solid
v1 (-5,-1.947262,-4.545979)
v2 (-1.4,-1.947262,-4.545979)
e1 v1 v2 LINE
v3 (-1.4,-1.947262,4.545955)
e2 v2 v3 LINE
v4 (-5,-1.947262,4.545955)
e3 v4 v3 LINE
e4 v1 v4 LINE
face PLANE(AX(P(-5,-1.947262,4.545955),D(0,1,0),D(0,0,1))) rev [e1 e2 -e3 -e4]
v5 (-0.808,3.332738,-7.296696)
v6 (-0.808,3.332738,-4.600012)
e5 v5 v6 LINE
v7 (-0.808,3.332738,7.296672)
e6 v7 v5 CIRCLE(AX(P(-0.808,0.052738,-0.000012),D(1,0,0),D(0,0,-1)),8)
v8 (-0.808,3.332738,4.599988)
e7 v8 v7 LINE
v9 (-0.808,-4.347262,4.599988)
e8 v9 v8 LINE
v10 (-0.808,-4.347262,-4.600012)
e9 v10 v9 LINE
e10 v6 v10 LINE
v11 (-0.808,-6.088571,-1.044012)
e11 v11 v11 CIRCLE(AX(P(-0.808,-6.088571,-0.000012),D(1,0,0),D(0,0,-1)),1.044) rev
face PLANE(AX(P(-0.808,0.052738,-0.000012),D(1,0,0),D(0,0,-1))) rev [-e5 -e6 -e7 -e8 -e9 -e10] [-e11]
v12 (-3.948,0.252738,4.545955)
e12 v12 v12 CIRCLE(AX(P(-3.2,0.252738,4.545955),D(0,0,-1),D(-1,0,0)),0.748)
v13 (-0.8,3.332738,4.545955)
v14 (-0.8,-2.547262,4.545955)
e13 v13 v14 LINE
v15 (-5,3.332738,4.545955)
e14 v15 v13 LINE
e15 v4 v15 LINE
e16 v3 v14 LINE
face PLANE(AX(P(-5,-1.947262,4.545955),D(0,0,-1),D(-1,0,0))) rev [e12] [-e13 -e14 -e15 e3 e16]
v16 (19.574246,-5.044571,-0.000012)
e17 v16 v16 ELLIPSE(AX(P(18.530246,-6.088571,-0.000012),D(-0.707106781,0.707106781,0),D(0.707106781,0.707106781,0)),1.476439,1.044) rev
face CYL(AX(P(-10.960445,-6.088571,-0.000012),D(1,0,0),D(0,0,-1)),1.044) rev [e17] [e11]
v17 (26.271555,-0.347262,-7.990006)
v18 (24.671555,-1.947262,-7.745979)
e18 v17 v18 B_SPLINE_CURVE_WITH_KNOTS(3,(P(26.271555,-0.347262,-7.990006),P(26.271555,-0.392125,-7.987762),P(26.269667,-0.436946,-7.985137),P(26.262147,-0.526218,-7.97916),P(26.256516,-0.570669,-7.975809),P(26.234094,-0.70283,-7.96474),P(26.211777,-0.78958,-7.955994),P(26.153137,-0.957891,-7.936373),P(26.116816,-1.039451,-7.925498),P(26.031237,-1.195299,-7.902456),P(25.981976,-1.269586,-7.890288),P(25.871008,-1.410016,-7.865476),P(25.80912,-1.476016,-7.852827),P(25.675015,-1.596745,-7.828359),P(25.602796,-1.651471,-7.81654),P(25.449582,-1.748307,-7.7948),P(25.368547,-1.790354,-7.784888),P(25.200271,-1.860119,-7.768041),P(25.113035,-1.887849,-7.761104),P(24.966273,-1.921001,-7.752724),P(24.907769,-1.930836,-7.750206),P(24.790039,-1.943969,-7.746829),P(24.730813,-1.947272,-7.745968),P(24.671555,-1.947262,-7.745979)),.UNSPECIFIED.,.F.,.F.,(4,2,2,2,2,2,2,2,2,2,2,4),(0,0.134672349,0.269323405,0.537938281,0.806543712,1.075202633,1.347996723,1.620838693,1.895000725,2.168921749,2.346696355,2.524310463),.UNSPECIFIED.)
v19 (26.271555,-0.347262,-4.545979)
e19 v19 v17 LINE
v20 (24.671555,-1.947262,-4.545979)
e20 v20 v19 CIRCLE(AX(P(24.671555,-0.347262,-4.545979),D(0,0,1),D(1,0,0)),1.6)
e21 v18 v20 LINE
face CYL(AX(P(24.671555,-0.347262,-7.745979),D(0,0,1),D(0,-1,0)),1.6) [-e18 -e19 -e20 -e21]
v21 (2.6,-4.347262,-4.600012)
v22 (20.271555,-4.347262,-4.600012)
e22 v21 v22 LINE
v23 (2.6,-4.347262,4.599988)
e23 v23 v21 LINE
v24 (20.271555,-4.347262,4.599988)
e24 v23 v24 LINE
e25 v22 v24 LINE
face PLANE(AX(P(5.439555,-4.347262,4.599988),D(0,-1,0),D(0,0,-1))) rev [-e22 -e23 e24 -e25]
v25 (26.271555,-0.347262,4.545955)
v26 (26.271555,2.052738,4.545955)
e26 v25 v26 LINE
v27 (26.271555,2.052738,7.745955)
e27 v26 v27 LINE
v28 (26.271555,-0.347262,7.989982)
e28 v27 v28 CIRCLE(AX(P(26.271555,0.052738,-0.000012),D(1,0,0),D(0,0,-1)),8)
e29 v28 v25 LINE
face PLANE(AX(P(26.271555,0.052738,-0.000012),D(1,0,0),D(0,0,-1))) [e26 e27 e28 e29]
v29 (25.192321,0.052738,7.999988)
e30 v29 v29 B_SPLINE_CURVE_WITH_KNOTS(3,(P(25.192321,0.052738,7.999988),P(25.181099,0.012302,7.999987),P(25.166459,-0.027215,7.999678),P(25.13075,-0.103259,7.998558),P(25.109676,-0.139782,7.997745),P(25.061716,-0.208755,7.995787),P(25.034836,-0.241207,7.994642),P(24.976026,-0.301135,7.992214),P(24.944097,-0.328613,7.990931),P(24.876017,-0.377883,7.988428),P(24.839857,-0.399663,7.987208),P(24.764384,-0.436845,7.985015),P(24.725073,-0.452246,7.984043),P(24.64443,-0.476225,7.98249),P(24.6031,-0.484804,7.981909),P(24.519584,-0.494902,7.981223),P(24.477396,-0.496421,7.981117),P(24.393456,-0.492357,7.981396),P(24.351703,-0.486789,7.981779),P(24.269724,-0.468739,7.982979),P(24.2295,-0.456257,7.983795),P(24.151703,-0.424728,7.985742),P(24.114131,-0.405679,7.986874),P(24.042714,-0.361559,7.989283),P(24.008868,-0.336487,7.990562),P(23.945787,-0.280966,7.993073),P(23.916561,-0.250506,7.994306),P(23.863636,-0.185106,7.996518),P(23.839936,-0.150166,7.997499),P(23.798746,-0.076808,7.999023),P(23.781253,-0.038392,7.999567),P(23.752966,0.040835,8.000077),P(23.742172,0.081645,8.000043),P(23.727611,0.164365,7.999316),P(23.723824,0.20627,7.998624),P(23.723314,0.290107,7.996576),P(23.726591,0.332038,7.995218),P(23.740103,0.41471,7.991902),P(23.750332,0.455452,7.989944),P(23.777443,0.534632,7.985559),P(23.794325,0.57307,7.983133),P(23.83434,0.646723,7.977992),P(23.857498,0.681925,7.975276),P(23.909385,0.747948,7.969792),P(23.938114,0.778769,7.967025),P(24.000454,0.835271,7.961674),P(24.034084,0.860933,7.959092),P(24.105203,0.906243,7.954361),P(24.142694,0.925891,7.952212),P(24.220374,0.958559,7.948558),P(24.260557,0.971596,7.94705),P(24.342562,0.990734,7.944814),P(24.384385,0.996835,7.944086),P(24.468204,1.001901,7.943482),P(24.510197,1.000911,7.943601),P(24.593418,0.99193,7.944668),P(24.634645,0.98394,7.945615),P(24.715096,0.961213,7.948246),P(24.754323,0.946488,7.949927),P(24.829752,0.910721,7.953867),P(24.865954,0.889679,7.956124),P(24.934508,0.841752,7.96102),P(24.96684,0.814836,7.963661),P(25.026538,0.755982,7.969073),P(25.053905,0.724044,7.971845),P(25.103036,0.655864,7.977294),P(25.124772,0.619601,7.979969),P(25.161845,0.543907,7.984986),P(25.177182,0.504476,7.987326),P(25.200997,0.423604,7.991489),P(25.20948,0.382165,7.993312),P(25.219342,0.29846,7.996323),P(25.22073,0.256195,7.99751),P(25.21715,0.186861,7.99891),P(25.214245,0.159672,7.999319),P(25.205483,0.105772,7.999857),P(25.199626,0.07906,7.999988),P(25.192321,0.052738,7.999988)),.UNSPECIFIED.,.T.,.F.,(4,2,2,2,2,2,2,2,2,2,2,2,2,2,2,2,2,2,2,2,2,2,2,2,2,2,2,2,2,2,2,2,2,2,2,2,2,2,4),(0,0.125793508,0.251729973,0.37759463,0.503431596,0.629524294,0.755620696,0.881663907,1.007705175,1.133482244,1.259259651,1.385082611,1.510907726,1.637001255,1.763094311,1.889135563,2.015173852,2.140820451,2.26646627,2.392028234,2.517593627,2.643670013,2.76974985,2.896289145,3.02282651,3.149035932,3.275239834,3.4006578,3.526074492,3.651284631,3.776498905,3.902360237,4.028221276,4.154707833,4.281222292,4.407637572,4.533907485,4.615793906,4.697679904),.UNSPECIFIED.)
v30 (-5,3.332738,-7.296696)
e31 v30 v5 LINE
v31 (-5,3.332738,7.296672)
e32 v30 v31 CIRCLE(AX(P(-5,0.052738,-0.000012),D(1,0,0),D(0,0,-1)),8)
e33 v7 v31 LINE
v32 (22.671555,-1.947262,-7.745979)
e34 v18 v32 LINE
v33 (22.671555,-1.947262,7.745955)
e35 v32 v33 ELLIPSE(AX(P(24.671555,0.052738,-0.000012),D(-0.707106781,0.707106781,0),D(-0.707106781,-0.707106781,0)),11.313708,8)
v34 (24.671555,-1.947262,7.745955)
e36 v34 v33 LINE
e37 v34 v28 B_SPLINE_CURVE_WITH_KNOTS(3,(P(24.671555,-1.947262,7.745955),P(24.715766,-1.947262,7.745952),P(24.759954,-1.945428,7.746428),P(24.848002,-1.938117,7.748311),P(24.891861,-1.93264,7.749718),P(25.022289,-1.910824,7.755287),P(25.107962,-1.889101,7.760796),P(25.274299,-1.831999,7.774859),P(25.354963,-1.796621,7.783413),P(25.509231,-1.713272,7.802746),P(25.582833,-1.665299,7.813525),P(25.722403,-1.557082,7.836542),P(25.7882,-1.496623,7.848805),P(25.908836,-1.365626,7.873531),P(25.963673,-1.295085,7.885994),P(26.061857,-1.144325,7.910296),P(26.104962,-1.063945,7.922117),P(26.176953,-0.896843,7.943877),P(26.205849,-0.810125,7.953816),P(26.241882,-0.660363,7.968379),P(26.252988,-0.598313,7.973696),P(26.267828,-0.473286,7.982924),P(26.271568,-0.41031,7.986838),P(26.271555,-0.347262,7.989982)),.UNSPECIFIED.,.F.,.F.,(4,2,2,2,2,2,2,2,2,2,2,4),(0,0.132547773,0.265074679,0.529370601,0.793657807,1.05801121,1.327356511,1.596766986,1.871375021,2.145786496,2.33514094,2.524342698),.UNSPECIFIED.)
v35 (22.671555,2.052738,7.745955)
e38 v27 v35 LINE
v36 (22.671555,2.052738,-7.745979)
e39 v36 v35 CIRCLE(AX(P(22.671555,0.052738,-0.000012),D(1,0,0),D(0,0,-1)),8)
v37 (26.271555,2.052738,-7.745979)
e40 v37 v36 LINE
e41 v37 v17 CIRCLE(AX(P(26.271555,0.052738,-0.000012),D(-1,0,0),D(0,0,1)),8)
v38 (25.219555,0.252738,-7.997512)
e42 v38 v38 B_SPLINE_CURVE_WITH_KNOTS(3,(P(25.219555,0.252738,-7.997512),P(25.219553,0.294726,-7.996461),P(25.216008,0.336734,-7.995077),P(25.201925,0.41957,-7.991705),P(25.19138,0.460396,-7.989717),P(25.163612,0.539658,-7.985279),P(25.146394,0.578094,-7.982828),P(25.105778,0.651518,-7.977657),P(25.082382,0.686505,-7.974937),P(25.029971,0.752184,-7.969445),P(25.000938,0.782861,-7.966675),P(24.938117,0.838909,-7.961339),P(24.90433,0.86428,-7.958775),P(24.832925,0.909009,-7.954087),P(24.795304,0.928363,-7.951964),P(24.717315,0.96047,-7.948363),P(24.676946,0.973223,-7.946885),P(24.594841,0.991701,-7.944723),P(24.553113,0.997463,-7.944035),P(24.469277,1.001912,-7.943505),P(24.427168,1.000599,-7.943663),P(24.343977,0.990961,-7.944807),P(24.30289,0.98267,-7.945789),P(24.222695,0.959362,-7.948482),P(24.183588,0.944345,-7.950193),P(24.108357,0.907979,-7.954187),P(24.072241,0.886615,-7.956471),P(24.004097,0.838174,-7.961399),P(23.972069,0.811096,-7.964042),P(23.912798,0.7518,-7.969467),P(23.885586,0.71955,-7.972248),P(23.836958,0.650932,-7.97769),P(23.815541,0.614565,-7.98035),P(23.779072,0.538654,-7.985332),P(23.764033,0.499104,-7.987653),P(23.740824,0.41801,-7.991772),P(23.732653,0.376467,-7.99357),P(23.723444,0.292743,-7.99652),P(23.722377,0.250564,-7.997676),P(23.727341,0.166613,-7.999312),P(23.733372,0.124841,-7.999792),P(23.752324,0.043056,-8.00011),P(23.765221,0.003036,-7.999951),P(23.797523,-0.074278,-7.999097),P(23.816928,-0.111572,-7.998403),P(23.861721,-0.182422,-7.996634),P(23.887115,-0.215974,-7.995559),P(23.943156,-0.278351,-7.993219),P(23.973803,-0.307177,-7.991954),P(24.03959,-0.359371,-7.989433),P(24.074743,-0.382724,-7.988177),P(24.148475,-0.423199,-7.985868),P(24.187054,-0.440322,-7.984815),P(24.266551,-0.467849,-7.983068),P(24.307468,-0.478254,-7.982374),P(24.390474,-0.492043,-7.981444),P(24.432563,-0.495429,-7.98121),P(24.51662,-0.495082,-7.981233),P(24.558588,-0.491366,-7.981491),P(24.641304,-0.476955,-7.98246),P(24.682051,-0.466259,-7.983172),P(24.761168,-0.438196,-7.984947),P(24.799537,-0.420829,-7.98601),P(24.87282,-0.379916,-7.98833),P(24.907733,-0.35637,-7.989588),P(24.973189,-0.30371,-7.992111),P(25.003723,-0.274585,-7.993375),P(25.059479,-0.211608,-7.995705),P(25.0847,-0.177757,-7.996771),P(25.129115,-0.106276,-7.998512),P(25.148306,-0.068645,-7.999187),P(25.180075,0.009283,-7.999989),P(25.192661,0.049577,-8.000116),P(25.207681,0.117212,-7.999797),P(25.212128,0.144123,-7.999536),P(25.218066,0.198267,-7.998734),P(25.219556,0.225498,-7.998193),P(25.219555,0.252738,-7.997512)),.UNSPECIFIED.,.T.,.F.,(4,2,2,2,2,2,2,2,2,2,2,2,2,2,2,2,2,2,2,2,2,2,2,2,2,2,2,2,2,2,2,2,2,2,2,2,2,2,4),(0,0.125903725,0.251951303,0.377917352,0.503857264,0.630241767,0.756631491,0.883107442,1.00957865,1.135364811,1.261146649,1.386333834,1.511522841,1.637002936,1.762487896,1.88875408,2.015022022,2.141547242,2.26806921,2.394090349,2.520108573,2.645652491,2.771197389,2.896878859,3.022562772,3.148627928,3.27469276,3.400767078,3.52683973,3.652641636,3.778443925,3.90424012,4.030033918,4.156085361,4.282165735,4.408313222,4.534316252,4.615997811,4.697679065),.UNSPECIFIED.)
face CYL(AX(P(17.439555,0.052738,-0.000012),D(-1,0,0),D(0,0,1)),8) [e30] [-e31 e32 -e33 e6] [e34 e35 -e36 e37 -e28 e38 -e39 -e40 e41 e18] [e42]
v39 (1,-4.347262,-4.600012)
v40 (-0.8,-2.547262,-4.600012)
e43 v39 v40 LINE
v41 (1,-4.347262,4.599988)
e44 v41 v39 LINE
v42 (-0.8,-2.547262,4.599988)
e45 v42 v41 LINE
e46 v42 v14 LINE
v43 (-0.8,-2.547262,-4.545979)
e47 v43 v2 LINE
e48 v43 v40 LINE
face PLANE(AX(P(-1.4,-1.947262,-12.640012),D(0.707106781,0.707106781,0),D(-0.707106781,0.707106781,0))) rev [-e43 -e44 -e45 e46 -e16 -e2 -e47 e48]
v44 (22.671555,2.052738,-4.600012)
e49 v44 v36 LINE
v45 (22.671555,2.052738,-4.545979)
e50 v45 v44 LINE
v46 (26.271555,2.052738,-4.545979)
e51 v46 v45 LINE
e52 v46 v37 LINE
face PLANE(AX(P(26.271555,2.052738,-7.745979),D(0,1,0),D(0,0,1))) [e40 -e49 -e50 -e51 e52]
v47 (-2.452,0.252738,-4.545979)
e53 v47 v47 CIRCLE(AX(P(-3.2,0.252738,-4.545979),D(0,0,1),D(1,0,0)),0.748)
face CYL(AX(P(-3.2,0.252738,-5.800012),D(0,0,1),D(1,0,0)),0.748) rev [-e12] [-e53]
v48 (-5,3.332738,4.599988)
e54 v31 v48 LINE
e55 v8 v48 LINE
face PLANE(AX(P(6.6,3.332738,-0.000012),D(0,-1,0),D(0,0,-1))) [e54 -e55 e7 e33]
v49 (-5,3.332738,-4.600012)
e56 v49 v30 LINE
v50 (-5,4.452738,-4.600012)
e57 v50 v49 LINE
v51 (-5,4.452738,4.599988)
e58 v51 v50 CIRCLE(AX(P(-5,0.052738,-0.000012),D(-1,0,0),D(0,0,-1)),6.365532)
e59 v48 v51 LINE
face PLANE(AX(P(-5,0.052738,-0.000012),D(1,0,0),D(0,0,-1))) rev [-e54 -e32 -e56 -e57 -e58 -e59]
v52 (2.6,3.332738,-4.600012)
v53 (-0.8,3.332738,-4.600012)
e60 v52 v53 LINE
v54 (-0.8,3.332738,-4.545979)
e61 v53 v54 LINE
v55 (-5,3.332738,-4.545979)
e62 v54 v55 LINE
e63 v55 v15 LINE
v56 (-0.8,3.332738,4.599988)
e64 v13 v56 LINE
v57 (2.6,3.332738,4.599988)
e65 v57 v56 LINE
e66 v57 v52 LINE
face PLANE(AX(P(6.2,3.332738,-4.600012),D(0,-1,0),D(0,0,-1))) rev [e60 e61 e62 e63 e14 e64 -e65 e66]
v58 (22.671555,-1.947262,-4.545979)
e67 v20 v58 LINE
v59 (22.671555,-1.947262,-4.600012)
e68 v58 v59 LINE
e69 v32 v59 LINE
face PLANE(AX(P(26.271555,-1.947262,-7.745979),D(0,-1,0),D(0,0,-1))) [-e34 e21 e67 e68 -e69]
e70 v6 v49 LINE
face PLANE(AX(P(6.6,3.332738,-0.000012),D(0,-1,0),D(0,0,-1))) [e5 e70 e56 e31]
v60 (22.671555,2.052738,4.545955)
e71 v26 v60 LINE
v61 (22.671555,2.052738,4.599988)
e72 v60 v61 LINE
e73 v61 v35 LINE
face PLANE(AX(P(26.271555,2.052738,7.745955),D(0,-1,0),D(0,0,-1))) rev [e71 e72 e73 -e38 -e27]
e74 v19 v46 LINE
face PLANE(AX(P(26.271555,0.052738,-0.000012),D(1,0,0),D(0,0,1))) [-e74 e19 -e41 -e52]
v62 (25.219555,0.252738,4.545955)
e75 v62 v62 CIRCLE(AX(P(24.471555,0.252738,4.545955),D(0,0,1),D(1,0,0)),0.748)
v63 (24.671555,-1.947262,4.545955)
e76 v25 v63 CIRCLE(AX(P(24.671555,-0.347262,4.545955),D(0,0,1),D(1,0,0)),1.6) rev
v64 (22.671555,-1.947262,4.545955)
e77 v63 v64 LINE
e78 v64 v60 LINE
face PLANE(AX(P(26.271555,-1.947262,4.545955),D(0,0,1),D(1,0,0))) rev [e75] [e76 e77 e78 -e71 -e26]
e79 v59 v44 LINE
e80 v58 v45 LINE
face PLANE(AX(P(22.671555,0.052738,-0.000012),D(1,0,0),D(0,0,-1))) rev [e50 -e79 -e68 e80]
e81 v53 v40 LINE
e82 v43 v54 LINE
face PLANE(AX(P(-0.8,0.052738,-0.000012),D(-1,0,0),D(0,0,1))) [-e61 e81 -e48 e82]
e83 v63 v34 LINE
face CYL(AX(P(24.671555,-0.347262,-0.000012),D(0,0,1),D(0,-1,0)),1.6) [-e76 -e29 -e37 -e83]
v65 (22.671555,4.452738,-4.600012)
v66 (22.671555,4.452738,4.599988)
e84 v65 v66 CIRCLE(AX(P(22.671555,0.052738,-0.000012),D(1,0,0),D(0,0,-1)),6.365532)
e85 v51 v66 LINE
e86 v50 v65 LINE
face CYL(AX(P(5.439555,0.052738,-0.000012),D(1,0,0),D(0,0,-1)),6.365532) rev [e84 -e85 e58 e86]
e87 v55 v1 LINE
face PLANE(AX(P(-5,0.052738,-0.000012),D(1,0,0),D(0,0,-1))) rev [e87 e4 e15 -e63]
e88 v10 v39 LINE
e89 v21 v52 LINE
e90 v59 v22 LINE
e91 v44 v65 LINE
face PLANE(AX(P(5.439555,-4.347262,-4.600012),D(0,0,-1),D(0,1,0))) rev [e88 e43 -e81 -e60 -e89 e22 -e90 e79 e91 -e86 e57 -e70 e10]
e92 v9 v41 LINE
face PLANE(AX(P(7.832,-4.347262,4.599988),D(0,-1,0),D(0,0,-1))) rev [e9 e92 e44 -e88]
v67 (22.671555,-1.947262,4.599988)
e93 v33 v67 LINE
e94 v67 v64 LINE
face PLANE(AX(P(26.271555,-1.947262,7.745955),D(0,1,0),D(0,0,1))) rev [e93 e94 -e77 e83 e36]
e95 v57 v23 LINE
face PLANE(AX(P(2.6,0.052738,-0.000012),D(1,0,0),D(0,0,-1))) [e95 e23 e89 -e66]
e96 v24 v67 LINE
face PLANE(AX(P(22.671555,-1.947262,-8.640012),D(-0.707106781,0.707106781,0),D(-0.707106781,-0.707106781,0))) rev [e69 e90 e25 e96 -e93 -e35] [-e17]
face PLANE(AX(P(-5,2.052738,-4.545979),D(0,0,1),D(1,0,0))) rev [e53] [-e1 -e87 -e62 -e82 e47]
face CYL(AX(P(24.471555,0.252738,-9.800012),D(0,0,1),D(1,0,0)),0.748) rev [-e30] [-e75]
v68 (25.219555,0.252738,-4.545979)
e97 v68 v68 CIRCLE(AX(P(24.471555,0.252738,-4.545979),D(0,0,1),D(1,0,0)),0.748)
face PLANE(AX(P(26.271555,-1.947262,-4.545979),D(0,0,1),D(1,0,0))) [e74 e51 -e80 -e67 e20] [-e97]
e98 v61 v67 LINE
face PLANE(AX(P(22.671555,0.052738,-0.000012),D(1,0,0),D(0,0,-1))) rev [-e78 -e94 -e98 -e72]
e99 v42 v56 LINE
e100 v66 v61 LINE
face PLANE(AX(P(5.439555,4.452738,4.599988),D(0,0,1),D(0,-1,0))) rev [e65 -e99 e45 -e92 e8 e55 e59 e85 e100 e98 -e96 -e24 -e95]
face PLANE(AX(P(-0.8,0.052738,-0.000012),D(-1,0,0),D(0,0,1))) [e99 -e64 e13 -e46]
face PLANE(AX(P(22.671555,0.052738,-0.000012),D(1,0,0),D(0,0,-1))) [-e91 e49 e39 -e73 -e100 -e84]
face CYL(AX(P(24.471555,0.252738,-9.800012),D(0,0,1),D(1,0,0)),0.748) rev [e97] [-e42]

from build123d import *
from build123d.topology import SkipClean

# Parameters (mm, degrees)
SKETCH1_R                = 10
BOSS_EXTRUDE1_DEPTH      = 10
SKETCH4_R                = 1.305
CUT_EXTRUDE3_DEPTH       = 25.5
BOSS_EXTRUDE2_START      = 4.5
BOSS_EXTRUDE2_DEPTH      = 4.5
SKETCH6_R                = 0.935
CUT_EXTRUDE4_DEPTH       = 12.25
SKETCH7_W                = 11.364916732
SKETCH7_H                = 5
BOSS_EXTRUDE3_DEPTH      = 4.5
SKETCH8_R                = 0.935
CUT_EXTRUDE5_DEPTH       = 7.25
BOSS_EXTRUDE4_DEPTH      = 4.5
CUT_EXTRUDE6_START       = -0.75
CUT_EXTRUDE6_DEPTH       = 0.75
SKETCH12_W               = 5.25
SKETCH12_H               = 4
CUT_EXTRUDE7_DEPTH       = 1.6
CUT_EXTRUDE8_DEPTH       = 15.8
FILLET1_R                = 2
CUT_EXTRUDE9_DEPTH       = 10.8
SKETCH15_W               = 11.364916732
SKETCH15_H               = 6.6
CUT_EXTRUDE10_DEPTH      = 1.6
CUT_EXTRUDE11_DEPTH      = 15
BOSS_EXTRUDE5_REACH      = 35.438
SKETCH17_R               = 10
SKETCH17_R_2             = 1.305
CUT_EXTRUDE12_DEPTH      = 14
SCALE1_SCALE             = 0.8
BOSS_EXTRUDE6_DEPTH      = 7
BOSS_EXTRUDE6_DEPTH_BACK = 2
SKETCH20_R               = 8
SKETCH20_R_2             = 1.044


with BuildPart() as part:
    # Sketch1 → Boss-Extrude1 (new, symmetric)
    with BuildSketch(Plane(origin=(0, 0, 0), x_dir=(0, 0, -1), z_dir=(1, 0, 0))):
        Circle(SKETCH1_R)
    extrude(amount=BOSS_EXTRUDE1_DEPTH, both=True)

    # Sketch4 → Cut-Extrude3 (cut, symmetric)
    with BuildSketch(Plane(origin=(0, -0.76336978, 0), x_dir=(0, 0, -1), z_dir=(1, 0, 0))):
        with Locations((0, -6.913267104)):
            Circle(SKETCH4_R)
    extrude(amount=CUT_EXTRUDE3_DEPTH, both=True, mode=Mode.SUBTRACT)

    # Sketch5 → Boss-Extrude2 (add)
    with BuildSketch(Plane(origin=(10, 0, 0), x_dir=(0, 0, -1), z_dir=(1, 0, 0)).offset(BOSS_EXTRUDE2_START)):
        with BuildLine():
            Line((-9.682458366, -2.5), (-5.682458366, -2.5))
            Line((-5.682458366, -2.5), (-5.682458366, 2.5))
            Line((-5.682458366, 2.5), (-9.682458366, 2.5))
            ThreePointArc((-9.682458366, 2.5), (-10, 0), (-9.682458366, -2.5))
        make_face()
    boss_extrude2 = extrude(amount=-BOSS_EXTRUDE2_DEPTH)

    # Mirror1: Boss-Extrude2 across plane
    add(boss_extrude2.mirror(Plane.XY))

    # Sketch6 → Cut-Extrude4 (cut, symmetric)
    with SkipClean():  # the faces are left unmerged after this step: merging them gives an invalid solid
        with BuildSketch(Plane.XY):
            with Locations((12.25, 0.25)):
                Circle(SKETCH6_R)
        extrude(amount=CUT_EXTRUDE4_DEPTH, both=True, mode=Mode.SUBTRACT)

    # Sketch7 → Boss-Extrude3 (add)
    with SkipClean():  # the faces are left unmerged after this step: merging them gives an invalid solid
        with BuildSketch(Plane.ZY.offset(10)):
            Rectangle(SKETCH7_W, SKETCH7_H)
        extrude(amount=BOSS_EXTRUDE3_DEPTH)

    # Sketch8 → Cut-Extrude5 (cut, symmetric)
    with SkipClean():  # the faces are left unmerged after this step: merging them gives an invalid solid
        with BuildSketch(Plane.XY):
            with Locations((-12.25, 0.25)):
                Circle(SKETCH8_R)
        extrude(amount=CUT_EXTRUDE5_DEPTH, both=True, mode=Mode.SUBTRACT)

    # Sketch10 → Boss-Extrude4 (add)
    with SkipClean():  # the faces are left unmerged after this step: merging them gives an invalid solid
        with BuildSketch(Plane.ZY.offset(10)):
            with BuildLine():
                Line((9.682458366, 2.5), (-9.682458366, 2.5))
                ThreePointArc((-9.682458366, 2.5), (0, 10), (9.682458366, 2.5))
            make_face()
        extrude(amount=BOSS_EXTRUDE4_DEPTH)

    # Cut-Extrude6: read off the stored shape, not the designer's step
    # Cut-Extrude6 outline → Cut-Extrude6 (cut)
    with SkipClean():  # the faces are left unmerged after this step: merging them gives an invalid solid
        with BuildSketch(Plane.ZY.offset(10).offset(CUT_EXTRUDE6_START)):
            with BuildLine():
                ThreePointArc((-9.682458366, 2.5), (-9.369942303, -3.493448331), (-5.682458366, -8.228588392))
                Line((-5.682458366, -8.228588392), (-5.682458366, 2.5))
                Line((-5.682458366, 2.5), (-9.682458366, 2.5))
            make_face()
            with BuildLine():
                Line((5.682458366, 2.5), (5.682458366, -8.228588392))
                ThreePointArc((5.682458366, -8.228588392), (9.369942303, -3.493448331), (9.682458366, 2.5))
                Line((9.682458366, 2.5), (5.682458366, 2.5))
            make_face()
        extrude(amount=CUT_EXTRUDE6_DEPTH, mode=Mode.SUBTRACT)

    # Sketch12 → Cut-Extrude7 (cut)
    with SkipClean():  # the faces are left unmerged after this step: merging them gives an invalid solid
        with BuildSketch(Plane.XZ.offset(-2.5)):
            with Locations((-11.875, -7.682458366)):
                Rectangle(SKETCH12_W, SKETCH12_H)
            with Locations((-11.875, 7.682458366)):
                Rectangle(SKETCH12_W, SKETCH12_H)
        extrude(amount=-CUT_EXTRUDE7_DEPTH, mode=Mode.SUBTRACT)

    # Sketch13 → Cut-Extrude8 (cut, symmetric)
    with SkipClean():  # the faces are left unmerged after this step: merging them gives an invalid solid
        with BuildSketch(Plane.XY):
            Polygon((-10, -8.228588392), (-10, -2.5), (-2.5, -10), (-10, -10), align=None)
        extrude(amount=CUT_EXTRUDE8_DEPTH, both=True, mode=Mode.SUBTRACT)

    # Fillet1
    fillet1_edges = [part.edges().sort_by_distance(p)[0] for p in [
        (14.5, -2.5, 7.682458366),
        (14.5, -2.5, -7.682458366),
    ]]
    fillet(fillet1_edges, radius=FILLET1_R)

    # Sketch14 → Cut-Extrude9 (cut, symmetric)
    with SkipClean():  # the faces are left unmerged after this step: merging them gives an invalid solid
        with BuildSketch(Plane.XY):
            Polygon((10, -10), (10, -2.5), (2.5, -10), align=None)
        extrude(amount=CUT_EXTRUDE9_DEPTH, both=True, mode=Mode.SUBTRACT)

    # Sketch15 → Cut-Extrude10 (cut)
    with SkipClean():  # the faces are left unmerged after this step: merging them gives an invalid solid
        with BuildSketch(Plane(origin=(10, 0, 0), x_dir=(0, 0, -1), z_dir=(1, 0, 0))):
            with Locations((0, -0.8)):
                Rectangle(SKETCH15_W, SKETCH15_H)
        extrude(amount=-CUT_EXTRUDE10_DEPTH, mode=Mode.SUBTRACT)

    # Sketch16 → Cut-Extrude11 (cut)
    with SkipClean():  # the faces are left unmerged after this step: merging them gives an invalid solid
        with BuildSketch(Plane(origin=(10, 0, 0), x_dir=(0, 0, -1), z_dir=(1, 0, 0))):
            with BuildLine():
                Line((-5.75, 5.5), (-5.75, -5.5))
                Line((-5.75, -5.5), (5.75, -5.5))
                Line((5.75, -5.5), (5.75, 5.5))
                ThreePointArc((5.75, 5.5), (0, 7.956915231), (-5.75, 5.5))
            make_face()
        extrude(amount=-CUT_EXTRUDE11_DEPTH, mode=Mode.SUBTRACT)


with BuildPart() as body_2:
    # Split1: the piece on the far side of the plane
    add(part.part)
    split(bisect_by=Plane(origin=(0, 0, 0), x_dir=(0, 0, 1), z_dir=(1, 0, 0)), keep=Keep.BOTTOM)


with BuildPart() as part_1:
    add(part.part)

    # Split1
    split(bisect_by=Plane(origin=(0, 0, 0), x_dir=(0, 0, 1), z_dir=(1, 0, 0)), keep=Keep.TOP)


with BuildPart() as part_2:
    # Body-Move/Copy1: moved
    add(part_1.part.moved(Location((15.8, 0, 0))))


    # Sketch17 → Boss-Extrude5 (add, up to next)
    with BuildSketch(Plane.ZY.offset(-15.8), mode=Mode.PRIVATE) as boss_extrude5_sk1:
        with Locations(Location((0, 0, 0), (0, 0, 357.134016017))):
            Circle(SKETCH17_R)
        with Locations(Location((0, -7.676636884, 0), (0, 0, 180))):
            Circle(SKETCH17_R_2, mode=Mode.SUBTRACT)
        with BuildLine():
            Line((-5.75, -5.5), (5.75, -5.5))
            Line((5.75, -5.5), (5.75, 5.5))
            ThreePointArc((5.75, 5.5), (0, 7.956915231), (-5.75, 5.5))
            Line((-5.75, 5.5), (-5.75, -5.5))
        make_face(mode=Mode.SUBTRACT)
    boss_extrude5_tool1 = extrude(boss_extrude5_sk1.sketch, amount=BOSS_EXTRUDE5_REACH, mode=Mode.PRIVATE) - body_2.part
    add(boss_extrude5_tool1.solids().sort_by_distance((15.8, 0.485858, -9.705003))[0])


with BuildPart() as body_2_1:
    # Body-Move/Copy2: moved
    add(body_2.part.moved(Location((9.26, 0, 0))))

    # Combine4: union part
    add(part_2.part)

    # Sketch18 → Cut-Extrude12 (cut)
    with SkipClean():  # the faces are left unmerged after this step: merging them gives an invalid solid
        with BuildSketch(Plane.ZY.offset(5.24)):
            with BuildLine():
                Line((-5.75, 5.5), (-5.75, 4.1))
                Line((-5.75, 4.1), (5.75, 4.1))
                Line((5.75, 4.1), (5.75, 5.5))
                ThreePointArc((5.75, 5.5), (0, 7.956915231), (-5.75, 5.5))
            make_face()
        extrude(amount=-CUT_EXTRUDE12_DEPTH, mode=Mode.SUBTRACT)


with BuildPart() as body_2_2:
    # Scale1: scaled about (10.157754057, 0.26372377, 1.86e-07)
    add(body_2_1.part.scale(SCALE1_SCALE).moved(Location((2.031550811, 0.052744754, 3.7e-08))))


with BuildPart() as body_2_2_1:
    # Split2: the piece on the far side of the plane
    add(body_2_2.part)
    split(bisect_by=Plane(origin=(10, 0, 0), x_dir=(0, 0, 1), z_dir=(1, 0, 0)), keep=Keep.BOTTOM)


with BuildPart() as body_2_3:
    add(body_2_2.part)

    # Split2
    split(bisect_by=Plane(origin=(10, 0, 0), x_dir=(0, 0, 1), z_dir=(1, 0, 0)), keep=Keep.TOP)



with BuildPart() as body_2_2_2:
    # Body-Move/Copy3: read off the stored shape, not the designer's step
    # Body-Move/Copy3: moved
    add(body_2_2_1.part.moved(Location((-2.8395551, 0, 0))))


with BuildPart() as body_2_4:
    with SkipClean():  # the faces are left unmerged after this step: merging them gives an invalid solid
        add(body_2_3.part)

        add(body_2_2_2.part)  # Boss-Extrude6 merges body 2 2
        # Sketch20 → Boss-Extrude6 (add, two sides: drawn at the far end of the back side and taken through both)
        with BuildSketch(Plane(origin=(7.160444914, 0, 0), x_dir=(0, 0, -1), z_dir=(1, 0, 0)).offset(-BOSS_EXTRUDE6_DEPTH_BACK)):
            with Locations(Location((1.2156e-05, 0.052738333, 0), (0, 0, 182.865983983))):
                Circle(SKETCH20_R)
            with Locations((1.2156e-05, -6.088571173)):
                Circle(SKETCH20_R_2, mode=Mode.SUBTRACT)
            with BuildLine():
                Line((-4.599987844, -4.347261667), (4.600012156, -4.347261667))
                Line((4.600012156, -4.347261667), (4.600012156, 4.452738333))
                ThreePointArc((4.600012156, 4.452738333), (1.2156e-05, 6.418270519), (-4.599987844, 4.452738333))
                Line((-4.599987844, 4.452738333), (-4.599987844, -4.347261667))
            make_face(mode=Mode.SUBTRACT)
        extrude(amount=BOSS_EXTRUDE6_DEPTH + BOSS_EXTRUDE6_DEPTH_BACK)


solid = body_2_4.part
